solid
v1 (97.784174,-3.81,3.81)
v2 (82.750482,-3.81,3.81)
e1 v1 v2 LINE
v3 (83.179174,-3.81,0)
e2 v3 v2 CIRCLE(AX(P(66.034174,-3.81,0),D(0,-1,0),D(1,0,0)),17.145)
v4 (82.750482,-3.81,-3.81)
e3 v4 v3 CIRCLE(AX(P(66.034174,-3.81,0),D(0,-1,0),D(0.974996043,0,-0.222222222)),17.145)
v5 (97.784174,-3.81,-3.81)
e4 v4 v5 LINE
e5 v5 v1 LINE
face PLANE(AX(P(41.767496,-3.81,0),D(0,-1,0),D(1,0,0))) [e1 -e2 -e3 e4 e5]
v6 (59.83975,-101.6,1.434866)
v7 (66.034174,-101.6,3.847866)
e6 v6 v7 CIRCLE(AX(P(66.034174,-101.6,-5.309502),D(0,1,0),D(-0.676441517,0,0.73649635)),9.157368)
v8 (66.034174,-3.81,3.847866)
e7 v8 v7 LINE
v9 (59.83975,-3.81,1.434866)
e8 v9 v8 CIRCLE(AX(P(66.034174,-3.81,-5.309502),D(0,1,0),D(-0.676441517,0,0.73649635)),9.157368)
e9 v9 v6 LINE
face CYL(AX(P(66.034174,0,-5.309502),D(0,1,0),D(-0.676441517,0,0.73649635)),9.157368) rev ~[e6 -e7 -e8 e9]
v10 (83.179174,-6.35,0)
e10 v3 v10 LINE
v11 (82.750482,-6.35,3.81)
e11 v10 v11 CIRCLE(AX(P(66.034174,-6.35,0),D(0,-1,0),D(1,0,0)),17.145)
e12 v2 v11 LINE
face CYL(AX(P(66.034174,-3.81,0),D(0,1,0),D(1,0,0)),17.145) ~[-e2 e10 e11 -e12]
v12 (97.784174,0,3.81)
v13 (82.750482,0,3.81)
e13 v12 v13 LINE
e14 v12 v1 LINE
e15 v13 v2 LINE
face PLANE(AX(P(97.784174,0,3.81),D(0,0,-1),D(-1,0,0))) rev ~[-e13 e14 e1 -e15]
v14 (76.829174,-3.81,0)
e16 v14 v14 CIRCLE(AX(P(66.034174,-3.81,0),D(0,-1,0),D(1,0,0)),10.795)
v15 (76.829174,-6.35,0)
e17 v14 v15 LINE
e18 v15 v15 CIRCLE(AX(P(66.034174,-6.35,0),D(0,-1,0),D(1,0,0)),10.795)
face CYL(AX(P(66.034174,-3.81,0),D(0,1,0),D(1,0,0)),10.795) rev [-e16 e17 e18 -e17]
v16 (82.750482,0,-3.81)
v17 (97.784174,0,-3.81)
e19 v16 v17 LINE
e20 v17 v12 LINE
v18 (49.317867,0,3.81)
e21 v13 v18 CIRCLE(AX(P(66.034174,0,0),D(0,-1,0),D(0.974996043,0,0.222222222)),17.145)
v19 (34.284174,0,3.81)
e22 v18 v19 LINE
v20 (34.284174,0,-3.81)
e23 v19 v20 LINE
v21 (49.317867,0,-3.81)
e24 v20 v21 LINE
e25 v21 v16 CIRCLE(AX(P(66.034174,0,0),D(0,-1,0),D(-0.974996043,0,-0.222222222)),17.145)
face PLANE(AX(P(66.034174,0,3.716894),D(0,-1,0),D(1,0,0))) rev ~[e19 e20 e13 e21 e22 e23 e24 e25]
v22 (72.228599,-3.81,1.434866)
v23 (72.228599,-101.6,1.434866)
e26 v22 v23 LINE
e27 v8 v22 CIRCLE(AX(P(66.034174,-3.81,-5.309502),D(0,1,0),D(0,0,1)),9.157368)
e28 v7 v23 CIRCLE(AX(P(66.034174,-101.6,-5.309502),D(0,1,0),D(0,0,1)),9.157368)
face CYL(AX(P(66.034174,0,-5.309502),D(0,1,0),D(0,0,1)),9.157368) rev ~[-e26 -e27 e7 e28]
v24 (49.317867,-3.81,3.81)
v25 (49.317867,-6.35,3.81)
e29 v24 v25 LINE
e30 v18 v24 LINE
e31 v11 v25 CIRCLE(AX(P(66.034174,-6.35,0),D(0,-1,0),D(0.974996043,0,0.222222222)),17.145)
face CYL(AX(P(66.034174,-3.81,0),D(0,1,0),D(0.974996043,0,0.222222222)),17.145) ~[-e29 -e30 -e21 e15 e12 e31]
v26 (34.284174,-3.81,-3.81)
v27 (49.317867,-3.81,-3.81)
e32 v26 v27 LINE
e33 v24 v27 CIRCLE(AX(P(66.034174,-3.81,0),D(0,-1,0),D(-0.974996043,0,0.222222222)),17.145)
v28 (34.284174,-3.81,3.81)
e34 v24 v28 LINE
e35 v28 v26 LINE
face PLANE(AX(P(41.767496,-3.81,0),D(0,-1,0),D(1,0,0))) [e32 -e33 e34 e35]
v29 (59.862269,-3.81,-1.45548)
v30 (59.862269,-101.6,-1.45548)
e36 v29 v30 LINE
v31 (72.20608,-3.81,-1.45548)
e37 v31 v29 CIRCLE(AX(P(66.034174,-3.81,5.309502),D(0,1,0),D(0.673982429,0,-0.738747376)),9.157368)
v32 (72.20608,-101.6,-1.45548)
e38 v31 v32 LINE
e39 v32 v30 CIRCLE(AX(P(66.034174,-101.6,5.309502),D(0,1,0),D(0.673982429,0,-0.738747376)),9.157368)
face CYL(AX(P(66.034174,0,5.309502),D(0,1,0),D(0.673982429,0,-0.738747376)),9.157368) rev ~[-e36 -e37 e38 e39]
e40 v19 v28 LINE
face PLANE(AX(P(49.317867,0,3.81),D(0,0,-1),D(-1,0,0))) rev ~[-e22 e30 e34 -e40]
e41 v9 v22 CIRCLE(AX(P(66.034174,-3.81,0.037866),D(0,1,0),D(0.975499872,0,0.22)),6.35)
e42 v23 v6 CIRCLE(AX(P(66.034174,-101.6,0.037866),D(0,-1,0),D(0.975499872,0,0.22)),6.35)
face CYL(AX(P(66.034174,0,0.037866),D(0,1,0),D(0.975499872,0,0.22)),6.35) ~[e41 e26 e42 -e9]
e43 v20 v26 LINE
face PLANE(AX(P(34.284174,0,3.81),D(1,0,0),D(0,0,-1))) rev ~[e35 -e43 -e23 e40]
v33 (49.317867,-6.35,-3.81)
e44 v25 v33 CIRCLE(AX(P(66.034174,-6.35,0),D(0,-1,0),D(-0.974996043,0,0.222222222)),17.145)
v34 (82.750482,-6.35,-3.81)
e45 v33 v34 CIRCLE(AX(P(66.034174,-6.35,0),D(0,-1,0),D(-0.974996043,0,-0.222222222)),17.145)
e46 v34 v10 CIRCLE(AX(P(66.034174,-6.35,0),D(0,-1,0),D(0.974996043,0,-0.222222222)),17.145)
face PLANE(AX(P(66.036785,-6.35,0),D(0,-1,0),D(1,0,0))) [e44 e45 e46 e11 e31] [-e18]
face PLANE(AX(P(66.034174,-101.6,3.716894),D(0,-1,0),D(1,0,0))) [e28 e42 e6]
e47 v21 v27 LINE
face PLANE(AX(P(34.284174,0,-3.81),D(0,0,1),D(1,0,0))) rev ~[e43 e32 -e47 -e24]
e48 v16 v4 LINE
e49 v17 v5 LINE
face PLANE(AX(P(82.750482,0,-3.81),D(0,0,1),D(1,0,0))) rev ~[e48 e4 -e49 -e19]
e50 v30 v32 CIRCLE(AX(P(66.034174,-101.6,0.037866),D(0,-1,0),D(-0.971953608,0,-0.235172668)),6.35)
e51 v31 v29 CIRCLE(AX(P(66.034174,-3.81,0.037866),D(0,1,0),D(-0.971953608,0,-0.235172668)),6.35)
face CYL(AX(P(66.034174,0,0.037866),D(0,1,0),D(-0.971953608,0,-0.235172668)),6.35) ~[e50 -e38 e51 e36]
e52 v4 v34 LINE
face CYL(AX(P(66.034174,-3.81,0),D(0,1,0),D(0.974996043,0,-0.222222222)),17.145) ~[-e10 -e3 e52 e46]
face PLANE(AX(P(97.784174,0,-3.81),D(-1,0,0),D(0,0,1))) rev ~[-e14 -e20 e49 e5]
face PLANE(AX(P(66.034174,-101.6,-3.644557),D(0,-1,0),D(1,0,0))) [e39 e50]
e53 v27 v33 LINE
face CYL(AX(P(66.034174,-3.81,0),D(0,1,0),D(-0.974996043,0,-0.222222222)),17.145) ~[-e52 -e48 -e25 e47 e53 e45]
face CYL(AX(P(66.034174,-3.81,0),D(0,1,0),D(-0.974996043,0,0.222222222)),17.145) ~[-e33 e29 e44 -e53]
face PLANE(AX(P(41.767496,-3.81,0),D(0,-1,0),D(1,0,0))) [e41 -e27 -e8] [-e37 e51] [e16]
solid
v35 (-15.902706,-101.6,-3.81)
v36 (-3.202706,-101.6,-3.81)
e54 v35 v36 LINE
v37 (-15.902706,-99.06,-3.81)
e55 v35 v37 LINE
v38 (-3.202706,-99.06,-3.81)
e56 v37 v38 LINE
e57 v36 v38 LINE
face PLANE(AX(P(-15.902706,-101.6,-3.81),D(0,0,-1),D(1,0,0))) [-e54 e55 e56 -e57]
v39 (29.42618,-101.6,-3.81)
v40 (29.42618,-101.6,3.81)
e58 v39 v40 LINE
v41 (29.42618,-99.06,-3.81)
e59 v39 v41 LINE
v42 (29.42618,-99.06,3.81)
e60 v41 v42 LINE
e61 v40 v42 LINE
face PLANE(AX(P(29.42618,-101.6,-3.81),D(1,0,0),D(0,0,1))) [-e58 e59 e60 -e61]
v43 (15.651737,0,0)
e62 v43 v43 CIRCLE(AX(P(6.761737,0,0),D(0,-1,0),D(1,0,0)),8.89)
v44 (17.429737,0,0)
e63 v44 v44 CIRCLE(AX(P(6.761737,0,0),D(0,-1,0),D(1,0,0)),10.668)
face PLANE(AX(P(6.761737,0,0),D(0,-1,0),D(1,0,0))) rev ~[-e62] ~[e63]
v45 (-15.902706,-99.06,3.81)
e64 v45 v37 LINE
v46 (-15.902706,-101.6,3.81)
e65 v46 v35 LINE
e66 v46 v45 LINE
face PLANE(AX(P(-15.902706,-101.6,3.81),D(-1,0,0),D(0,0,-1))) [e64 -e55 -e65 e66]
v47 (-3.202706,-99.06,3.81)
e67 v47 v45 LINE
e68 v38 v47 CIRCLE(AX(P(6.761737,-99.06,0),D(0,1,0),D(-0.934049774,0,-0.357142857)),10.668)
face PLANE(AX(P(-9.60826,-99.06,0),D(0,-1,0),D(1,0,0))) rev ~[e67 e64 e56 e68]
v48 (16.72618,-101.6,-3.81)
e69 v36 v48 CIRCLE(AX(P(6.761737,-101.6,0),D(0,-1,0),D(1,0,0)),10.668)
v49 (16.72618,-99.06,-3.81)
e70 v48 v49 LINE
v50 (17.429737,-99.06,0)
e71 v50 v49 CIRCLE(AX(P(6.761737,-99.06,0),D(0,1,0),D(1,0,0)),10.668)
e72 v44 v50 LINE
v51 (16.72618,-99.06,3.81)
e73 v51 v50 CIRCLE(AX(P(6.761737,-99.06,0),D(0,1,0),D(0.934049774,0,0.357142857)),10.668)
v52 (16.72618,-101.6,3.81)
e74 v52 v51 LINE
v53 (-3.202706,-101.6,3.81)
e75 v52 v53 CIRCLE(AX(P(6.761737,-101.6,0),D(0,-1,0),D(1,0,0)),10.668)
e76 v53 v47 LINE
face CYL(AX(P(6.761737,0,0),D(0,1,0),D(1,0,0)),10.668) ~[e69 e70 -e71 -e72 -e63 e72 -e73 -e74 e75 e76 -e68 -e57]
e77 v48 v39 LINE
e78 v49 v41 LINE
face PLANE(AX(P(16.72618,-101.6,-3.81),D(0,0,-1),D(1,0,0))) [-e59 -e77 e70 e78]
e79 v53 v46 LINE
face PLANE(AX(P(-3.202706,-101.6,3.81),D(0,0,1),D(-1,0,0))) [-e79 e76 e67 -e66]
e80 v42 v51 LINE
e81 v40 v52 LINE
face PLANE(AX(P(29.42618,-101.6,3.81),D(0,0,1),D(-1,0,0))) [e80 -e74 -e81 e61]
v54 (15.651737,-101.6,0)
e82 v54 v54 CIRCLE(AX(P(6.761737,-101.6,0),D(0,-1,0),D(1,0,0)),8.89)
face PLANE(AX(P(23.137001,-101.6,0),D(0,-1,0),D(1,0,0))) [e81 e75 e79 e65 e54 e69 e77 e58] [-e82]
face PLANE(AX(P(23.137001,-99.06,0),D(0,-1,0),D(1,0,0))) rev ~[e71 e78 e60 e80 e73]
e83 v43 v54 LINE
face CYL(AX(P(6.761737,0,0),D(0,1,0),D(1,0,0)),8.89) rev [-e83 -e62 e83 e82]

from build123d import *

# Parameters (mm, degrees)
F0_R     = 15.875
F1_DEPTH = 3.81
F2_R     = 10.795
F3_DEPTH = 2.54
F4_R     = 10.668
F4_R_2   = 8.89
F5_DEPTH = 101.6
F7_DEPTH = 101.6
F9_DEPTH = 2.54


# Not quite as in the source:
# - a feature names something its author has since deleted; it is built from what else it names


with BuildPart() as f1:
    # F0 (on Front) → F1 (new body)
    with BuildSketch(Plane.XZ):
        with BuildLine():
            Line((34.2841744423, 3.81), (34.2841744423, 0))
            Line((34.2841744423, 0), (34.2841744423, -3.81))
            Line((34.2841744423, -3.81), (49.3178672843, -3.81))
            ThreePointArc((49.3178672843, -3.81), (48.8891744423, 0), (49.3178672843, 3.81))
            Line((49.3178672843, 3.81), (34.2841744423, 3.81))
        make_face()
        with BuildLine():
            Line((97.7841744423, 3.81), (82.7504816003, 3.81))
            ThreePointArc((82.7504816003, 3.81), (83.0716641521, 1.9170209671), (83.1791744423, 0))
            ThreePointArc((83.1791744423, 0), (83.0716641521, -1.9170209671), (82.7504816003, -3.81))
            Line((82.7504816003, -3.81), (97.7841744423, -3.81))
            Line((97.7841744423, -3.81), (97.7841744423, 0))
            Line((97.7841744423, 0), (97.7841744423, 3.81))
        make_face()
        with BuildLine():
            ThreePointArc((82.7504816003, 3.81), (66.0341744423, 17.145), (49.3178672843, 3.81))
            ThreePointArc((49.3178672843, 3.81), (48.8891744423, 0), (49.3178672843, -3.81))
            ThreePointArc((49.3178672843, -3.81), (66.0341744423, -17.145), (82.7504816003, -3.81))
            ThreePointArc((82.7504816003, -3.81), (83.0716641521, -1.9170209671), (83.1791744423, 0))
            ThreePointArc((83.1791744423, 0), (83.0716641521, 1.9170209671), (82.7504816003, 3.81))
        make_face()
        with Locations((66.0341744423, 0)):
            Circle(F0_R, mode=Mode.SUBTRACT)
        with Locations((66.0341744423, 0)):
            Circle(F0_R)
    extrude(amount=F1_DEPTH)

    # F2 (on face) → F3 (join)
    with BuildSketch(Plane.XZ.offset(3.81)):
        with BuildLine():
            ThreePointArc((82.7504816003, 3.81), (66.0341744423, 17.145), (49.3178672843, 3.81))
            ThreePointArc((49.3178672843, 3.81), (48.8891744423, 0), (49.3178672843, -3.81))
            ThreePointArc((49.3178672843, -3.81), (66.0341744423, -17.145), (82.7504816003, -3.81))
            ThreePointArc((82.7504816003, -3.81), (83.0716641521, -1.9170209671), (83.1791744423, 0))
            ThreePointArc((83.1791744423, 0), (83.0716641521, 1.9170209671), (82.7504816003, 3.81))
        make_face()
        with Locations((66.0341744423, 0)):
            Circle(F2_R, mode=Mode.SUBTRACT)
    extrude(amount=F3_DEPTH)

    # F6 (on Front) → F7 (join)
    with BuildSketch(Plane.XZ):
        with BuildLine():
            ThreePointArc((66.0341744423, 3.8478664845), (69.3580825337, 3.2233188982), (72.2285986286, 1.4348664845))
            ThreePointArc((72.2285986286, 1.4348664845), (66.0341744423, 6.3878664845), (59.839750256, 1.4348664845))
            ThreePointArc((59.839750256, 1.4348664845), (62.7102663509, 3.2233188982), (66.0341744423, 3.8478664845))
        make_face()
        with BuildLine():
            ThreePointArc((59.8622690304, -1.4554799544), (66.0341744423, -6.3121335155), (72.2060798542, -1.4554799544))
            ThreePointArc((72.2060798542, -1.4554799544), (66.0341744423, -3.8478664845), (59.8622690304, -1.4554799544))
        make_face()
    extrude(amount=F7_DEPTH)


with BuildPart() as f5:
    # F4 (on Front) → F5 (new body)
    with BuildSketch(Plane.XZ):
        with Locations((6.7617367022, 0)):
            Circle(F4_R)
        with Locations((6.7617367022, 0)):
            Circle(F4_R_2, mode=Mode.SUBTRACT)
    extrude(amount=F5_DEPTH)

    # F8 (on face) → F9 (join)
    with BuildSketch(Plane.XZ.offset(101.6)):
        with BuildLine():
            ThreePointArc((-3.2027062828, -3.81), (-3.9062632978, 0), (-3.2027062828, 3.81))
            Line((-3.2027062828, 3.81), (-15.9027062828, 3.81))
            Line((-15.9027062828, 3.81), (-15.9027062828, -3.81))
            Line((-15.9027062828, -3.81), (-3.2027062828, -3.81))
        make_face()
        with BuildLine():
            Line((29.4261796871, 3.81), (16.7261796871, 3.81))
            ThreePointArc((16.7261796871, 3.81), (17.2523730452, 1.9372075569), (17.4297367022, 0))
            ThreePointArc((17.4297367022, 0), (17.2523730452, -1.9372075569), (16.7261796871, -3.81))
            Line((16.7261796871, -3.81), (29.4261796871, -3.81))
            Line((29.4261796871, -3.81), (29.4261796871, 3.81))
        make_face()
    extrude(amount=-F9_DEPTH)


solid = Compound([f1.part, f5.part])
